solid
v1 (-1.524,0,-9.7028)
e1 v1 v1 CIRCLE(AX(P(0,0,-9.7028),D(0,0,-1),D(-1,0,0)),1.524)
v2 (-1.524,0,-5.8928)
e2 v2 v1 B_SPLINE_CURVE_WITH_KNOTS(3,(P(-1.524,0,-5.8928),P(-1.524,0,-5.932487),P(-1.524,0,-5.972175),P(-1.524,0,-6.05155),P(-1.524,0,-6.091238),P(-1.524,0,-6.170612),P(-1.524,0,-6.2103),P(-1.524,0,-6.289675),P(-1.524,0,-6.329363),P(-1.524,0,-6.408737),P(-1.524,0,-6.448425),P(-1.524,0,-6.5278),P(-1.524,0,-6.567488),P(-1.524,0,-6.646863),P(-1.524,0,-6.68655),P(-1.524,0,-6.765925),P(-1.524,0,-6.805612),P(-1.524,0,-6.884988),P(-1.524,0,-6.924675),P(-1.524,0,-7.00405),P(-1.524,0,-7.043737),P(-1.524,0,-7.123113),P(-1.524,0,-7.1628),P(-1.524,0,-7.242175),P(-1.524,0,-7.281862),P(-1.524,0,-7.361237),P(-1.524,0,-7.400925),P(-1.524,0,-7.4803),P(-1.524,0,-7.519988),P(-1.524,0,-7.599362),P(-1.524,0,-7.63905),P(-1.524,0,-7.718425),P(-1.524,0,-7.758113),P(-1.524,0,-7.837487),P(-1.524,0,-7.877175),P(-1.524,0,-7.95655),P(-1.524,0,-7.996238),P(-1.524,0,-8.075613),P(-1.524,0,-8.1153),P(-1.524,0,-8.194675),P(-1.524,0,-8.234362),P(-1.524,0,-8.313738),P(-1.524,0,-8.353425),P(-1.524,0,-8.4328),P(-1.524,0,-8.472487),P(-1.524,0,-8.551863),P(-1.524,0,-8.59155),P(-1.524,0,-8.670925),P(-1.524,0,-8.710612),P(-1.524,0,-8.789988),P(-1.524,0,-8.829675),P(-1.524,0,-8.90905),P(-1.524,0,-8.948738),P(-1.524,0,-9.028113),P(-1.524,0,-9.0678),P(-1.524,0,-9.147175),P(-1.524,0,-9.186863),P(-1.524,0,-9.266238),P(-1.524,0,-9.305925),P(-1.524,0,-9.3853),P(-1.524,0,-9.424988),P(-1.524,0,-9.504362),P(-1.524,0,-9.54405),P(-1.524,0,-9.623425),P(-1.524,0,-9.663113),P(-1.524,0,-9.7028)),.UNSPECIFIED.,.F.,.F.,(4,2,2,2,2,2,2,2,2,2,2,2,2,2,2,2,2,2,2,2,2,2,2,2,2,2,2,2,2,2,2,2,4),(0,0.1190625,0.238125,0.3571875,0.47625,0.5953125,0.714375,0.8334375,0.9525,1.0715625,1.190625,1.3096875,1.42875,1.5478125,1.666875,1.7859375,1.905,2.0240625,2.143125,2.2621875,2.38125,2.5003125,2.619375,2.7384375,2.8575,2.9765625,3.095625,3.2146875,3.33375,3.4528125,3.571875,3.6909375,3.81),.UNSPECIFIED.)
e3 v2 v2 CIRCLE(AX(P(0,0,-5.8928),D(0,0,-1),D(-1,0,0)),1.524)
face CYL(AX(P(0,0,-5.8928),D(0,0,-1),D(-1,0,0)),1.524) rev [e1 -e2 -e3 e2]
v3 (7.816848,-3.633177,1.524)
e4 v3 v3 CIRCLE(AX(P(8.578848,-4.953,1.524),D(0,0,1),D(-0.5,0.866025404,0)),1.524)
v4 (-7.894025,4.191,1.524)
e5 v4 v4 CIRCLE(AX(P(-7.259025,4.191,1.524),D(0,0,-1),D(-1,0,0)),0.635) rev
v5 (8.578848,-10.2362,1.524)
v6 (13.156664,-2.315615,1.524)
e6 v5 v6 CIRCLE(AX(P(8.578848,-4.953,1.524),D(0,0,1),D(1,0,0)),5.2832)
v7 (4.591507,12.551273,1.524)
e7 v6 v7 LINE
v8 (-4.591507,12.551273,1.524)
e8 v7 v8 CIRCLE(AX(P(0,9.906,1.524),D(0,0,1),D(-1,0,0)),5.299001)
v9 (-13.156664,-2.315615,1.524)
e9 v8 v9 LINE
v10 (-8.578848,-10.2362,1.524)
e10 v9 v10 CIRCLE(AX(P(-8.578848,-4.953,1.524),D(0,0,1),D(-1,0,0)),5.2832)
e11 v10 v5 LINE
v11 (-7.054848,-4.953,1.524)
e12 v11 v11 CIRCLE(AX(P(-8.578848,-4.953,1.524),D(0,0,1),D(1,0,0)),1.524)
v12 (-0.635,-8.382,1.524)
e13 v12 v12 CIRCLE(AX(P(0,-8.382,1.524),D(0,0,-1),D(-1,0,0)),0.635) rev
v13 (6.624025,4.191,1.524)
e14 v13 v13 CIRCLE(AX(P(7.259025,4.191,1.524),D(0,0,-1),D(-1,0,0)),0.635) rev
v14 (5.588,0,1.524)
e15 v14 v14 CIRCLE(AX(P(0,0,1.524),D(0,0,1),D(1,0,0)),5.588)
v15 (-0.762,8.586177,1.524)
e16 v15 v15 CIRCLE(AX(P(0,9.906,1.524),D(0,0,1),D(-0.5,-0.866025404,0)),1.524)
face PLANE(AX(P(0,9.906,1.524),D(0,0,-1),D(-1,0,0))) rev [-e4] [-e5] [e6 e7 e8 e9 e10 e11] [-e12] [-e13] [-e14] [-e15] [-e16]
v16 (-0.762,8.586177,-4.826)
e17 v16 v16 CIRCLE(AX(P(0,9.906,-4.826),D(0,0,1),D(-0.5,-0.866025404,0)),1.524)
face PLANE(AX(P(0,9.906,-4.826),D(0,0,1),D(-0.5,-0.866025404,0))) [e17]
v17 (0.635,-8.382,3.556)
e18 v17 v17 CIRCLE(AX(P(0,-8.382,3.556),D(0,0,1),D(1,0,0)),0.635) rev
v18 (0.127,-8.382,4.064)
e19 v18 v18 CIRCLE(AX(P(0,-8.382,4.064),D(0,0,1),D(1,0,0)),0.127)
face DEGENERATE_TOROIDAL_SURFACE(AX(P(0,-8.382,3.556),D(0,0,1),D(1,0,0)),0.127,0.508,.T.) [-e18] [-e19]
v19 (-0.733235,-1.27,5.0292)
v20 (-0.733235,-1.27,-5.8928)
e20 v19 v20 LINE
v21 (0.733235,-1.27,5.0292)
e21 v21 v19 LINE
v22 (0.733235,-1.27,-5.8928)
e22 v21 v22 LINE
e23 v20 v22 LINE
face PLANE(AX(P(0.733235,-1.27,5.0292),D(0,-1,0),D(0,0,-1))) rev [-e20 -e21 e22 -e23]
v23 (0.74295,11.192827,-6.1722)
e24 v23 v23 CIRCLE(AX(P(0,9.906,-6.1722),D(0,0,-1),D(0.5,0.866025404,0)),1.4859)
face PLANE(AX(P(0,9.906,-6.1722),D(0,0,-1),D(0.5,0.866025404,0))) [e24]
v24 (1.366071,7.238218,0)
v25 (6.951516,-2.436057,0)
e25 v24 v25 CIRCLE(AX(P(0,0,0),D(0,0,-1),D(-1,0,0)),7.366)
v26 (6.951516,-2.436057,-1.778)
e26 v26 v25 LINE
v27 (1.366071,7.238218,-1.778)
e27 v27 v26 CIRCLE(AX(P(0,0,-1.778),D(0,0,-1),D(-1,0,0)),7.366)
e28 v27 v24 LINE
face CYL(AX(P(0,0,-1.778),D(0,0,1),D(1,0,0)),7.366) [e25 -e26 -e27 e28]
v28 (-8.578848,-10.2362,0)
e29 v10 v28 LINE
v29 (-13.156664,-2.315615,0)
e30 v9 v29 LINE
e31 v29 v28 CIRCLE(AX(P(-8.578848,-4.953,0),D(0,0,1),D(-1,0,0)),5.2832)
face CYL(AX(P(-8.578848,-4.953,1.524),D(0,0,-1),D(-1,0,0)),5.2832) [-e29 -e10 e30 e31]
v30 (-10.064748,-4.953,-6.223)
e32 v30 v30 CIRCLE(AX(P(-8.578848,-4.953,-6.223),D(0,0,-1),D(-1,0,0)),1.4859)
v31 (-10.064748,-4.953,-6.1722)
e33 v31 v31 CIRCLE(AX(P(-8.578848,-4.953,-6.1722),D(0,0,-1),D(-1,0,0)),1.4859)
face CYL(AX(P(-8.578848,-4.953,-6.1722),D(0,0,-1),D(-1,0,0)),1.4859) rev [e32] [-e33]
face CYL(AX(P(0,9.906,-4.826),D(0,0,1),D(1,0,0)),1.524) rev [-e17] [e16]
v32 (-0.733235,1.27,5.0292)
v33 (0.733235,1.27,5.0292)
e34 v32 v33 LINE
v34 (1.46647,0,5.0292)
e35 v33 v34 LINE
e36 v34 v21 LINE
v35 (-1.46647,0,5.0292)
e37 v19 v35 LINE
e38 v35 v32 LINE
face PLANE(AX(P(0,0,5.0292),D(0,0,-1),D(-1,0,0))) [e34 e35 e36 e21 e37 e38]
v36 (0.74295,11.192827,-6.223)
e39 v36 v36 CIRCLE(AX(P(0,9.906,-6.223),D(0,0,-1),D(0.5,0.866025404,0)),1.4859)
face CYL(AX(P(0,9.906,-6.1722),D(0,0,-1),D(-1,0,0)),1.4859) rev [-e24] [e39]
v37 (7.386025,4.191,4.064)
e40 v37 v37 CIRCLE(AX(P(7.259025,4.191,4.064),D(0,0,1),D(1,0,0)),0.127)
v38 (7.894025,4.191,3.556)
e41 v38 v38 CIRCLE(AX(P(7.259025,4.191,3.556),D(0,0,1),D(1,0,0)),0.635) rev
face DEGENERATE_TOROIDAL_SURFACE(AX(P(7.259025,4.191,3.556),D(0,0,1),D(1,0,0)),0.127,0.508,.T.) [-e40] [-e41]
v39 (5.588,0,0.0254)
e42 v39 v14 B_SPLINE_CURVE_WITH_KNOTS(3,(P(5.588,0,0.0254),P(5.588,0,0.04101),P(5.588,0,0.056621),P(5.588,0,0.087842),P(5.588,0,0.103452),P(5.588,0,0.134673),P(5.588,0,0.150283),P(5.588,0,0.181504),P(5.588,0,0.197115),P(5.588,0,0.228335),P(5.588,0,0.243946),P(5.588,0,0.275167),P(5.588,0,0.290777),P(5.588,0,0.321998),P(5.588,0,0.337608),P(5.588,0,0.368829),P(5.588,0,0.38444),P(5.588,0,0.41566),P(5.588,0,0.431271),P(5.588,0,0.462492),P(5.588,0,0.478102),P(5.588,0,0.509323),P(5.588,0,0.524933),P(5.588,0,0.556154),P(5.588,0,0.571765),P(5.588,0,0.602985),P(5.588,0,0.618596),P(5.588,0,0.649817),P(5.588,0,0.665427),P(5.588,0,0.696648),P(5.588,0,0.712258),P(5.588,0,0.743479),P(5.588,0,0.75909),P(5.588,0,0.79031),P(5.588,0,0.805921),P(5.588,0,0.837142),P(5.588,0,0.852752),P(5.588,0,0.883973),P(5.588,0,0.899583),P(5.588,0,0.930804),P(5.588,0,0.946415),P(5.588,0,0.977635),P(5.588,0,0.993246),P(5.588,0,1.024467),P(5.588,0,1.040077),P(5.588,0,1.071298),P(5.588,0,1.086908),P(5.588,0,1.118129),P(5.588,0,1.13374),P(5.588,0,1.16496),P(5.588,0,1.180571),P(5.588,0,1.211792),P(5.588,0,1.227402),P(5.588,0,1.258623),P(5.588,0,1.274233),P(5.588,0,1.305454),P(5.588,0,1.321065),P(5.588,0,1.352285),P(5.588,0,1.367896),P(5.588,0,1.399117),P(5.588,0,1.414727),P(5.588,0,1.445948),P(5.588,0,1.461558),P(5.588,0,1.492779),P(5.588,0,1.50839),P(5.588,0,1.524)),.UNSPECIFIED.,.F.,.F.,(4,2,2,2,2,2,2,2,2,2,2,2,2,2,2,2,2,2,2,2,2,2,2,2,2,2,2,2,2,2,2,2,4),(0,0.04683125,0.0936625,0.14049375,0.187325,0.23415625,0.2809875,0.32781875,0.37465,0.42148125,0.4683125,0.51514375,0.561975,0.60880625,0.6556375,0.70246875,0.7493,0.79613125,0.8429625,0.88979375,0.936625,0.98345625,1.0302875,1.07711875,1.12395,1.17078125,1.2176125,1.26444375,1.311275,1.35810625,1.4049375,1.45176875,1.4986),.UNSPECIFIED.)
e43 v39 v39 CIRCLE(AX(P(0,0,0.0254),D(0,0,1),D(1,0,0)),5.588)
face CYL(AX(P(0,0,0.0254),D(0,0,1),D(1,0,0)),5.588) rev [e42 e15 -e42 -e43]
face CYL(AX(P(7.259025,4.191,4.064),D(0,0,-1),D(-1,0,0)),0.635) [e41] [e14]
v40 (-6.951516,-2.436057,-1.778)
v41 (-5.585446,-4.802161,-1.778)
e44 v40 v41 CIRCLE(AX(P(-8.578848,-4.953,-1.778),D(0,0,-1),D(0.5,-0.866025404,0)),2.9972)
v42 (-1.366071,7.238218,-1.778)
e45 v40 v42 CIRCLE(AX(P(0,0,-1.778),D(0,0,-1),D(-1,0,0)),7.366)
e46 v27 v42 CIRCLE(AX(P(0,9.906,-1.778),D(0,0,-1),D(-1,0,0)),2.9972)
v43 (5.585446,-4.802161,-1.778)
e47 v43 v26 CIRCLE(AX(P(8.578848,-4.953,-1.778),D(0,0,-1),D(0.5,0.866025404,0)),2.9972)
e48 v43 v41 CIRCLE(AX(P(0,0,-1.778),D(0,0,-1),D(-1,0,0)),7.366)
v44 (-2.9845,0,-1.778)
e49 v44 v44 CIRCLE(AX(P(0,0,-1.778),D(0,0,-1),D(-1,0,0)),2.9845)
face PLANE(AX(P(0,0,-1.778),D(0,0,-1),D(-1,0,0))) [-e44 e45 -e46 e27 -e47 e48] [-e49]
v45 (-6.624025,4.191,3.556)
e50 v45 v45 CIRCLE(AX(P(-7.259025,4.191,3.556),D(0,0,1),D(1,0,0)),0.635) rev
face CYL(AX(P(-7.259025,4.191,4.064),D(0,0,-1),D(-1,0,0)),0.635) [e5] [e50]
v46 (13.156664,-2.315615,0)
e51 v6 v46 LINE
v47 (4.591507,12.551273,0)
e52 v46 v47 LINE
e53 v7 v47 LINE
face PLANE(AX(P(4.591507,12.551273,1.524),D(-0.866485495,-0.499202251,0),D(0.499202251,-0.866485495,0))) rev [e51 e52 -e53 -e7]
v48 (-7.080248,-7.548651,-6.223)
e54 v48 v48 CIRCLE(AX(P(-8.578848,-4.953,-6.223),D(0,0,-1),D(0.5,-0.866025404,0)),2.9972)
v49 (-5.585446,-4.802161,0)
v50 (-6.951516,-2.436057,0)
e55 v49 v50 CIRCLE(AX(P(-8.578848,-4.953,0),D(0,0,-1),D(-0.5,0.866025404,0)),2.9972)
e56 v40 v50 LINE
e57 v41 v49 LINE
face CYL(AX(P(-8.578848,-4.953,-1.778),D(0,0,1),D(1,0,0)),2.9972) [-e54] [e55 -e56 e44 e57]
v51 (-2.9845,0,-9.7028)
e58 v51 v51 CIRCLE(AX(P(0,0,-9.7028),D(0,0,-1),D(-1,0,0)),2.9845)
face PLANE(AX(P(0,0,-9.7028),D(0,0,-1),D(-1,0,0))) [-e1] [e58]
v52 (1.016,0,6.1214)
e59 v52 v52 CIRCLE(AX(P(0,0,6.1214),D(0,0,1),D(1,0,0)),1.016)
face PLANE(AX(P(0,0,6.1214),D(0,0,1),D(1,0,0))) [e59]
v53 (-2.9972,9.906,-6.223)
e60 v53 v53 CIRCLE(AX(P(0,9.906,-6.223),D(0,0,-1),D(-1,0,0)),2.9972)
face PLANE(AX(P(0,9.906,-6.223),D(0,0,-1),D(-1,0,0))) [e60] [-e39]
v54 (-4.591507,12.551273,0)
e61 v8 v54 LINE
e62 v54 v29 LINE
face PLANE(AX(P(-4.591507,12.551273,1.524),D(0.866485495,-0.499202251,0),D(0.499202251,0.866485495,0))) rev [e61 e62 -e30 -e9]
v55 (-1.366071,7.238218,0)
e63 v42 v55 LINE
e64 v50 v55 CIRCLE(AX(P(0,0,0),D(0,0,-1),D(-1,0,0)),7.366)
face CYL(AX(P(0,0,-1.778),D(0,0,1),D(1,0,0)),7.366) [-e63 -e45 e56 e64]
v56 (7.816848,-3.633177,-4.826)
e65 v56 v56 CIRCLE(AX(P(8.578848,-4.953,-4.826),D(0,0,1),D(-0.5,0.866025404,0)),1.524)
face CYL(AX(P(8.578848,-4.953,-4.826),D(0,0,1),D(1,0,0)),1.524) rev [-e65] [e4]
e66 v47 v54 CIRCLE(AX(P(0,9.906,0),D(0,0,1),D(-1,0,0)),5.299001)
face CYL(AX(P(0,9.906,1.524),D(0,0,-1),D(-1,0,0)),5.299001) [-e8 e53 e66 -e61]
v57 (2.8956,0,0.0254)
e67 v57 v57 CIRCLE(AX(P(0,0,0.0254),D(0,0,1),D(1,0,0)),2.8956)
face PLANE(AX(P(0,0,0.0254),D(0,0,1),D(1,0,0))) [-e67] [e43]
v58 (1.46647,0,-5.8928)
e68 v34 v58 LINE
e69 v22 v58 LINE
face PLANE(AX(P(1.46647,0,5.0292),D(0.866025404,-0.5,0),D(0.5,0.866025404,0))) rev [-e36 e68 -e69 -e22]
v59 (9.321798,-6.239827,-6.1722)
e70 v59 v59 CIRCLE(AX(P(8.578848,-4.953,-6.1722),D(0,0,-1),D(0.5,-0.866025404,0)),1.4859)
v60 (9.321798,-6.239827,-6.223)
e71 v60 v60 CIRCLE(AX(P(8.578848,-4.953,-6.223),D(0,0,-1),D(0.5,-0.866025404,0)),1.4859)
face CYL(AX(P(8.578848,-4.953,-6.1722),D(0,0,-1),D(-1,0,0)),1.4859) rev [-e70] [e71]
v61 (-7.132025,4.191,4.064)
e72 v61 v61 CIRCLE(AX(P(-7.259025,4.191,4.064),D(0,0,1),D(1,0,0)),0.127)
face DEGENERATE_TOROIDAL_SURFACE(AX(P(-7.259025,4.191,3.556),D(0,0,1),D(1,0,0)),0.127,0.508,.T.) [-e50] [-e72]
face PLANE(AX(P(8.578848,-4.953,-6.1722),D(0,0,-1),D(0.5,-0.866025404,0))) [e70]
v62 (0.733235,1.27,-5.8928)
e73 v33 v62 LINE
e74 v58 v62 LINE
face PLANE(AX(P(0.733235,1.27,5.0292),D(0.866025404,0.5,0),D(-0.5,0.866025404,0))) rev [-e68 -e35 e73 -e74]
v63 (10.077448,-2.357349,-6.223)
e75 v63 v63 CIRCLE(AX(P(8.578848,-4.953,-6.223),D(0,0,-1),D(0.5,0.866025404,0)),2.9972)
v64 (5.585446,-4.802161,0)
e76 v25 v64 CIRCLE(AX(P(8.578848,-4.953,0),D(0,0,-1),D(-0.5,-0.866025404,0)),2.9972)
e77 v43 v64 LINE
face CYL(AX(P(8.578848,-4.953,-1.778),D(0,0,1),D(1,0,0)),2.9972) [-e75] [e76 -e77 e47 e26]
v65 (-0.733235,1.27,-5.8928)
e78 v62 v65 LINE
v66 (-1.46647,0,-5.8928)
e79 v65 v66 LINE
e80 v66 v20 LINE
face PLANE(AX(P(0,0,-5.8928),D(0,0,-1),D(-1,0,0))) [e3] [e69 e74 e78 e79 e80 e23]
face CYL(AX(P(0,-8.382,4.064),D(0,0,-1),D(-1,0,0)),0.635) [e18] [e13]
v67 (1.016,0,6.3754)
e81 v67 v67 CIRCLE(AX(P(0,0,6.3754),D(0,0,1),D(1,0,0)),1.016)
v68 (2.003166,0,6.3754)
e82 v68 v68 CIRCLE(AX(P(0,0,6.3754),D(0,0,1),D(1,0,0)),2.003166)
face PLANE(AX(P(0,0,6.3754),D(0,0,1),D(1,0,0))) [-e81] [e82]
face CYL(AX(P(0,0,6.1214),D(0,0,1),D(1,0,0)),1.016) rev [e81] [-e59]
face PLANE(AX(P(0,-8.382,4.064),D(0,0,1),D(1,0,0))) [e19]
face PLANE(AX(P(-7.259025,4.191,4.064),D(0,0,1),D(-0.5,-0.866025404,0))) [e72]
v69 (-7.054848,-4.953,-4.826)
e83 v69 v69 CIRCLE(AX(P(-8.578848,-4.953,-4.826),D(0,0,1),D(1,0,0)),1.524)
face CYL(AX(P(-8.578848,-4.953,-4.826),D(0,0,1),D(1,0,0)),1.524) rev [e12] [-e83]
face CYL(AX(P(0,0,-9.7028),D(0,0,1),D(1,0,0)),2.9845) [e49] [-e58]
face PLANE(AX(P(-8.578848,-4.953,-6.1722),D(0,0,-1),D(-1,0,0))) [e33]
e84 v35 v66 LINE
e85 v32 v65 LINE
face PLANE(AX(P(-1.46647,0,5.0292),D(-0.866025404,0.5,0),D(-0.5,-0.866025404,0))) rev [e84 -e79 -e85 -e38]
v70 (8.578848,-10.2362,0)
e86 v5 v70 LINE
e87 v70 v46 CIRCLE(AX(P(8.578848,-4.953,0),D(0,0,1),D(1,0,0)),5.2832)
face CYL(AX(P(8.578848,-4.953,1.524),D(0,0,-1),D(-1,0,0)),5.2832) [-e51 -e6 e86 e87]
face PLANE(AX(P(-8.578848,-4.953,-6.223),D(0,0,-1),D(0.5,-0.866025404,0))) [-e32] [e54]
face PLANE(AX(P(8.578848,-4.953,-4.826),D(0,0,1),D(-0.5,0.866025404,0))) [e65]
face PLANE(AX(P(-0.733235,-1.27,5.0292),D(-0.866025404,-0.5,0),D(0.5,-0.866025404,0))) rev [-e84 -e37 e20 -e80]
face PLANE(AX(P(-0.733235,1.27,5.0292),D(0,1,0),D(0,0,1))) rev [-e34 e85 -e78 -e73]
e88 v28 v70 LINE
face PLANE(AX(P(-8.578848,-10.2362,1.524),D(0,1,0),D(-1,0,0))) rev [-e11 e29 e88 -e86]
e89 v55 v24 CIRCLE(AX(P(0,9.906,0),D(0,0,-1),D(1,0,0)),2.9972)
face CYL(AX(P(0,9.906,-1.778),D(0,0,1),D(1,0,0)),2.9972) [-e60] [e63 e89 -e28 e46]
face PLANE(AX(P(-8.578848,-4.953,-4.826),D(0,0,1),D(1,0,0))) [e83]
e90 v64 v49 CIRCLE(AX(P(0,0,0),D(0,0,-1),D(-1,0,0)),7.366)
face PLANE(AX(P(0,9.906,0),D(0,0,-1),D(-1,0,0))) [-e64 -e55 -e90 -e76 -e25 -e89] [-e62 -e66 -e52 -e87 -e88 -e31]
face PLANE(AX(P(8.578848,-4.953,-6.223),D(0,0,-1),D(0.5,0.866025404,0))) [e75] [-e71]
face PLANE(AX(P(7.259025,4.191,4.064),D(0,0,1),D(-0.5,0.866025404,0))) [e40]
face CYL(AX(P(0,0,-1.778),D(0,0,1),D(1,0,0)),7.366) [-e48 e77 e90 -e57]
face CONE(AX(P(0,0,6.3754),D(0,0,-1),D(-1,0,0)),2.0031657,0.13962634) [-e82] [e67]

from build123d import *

# Parameters (mm, degrees)
BOSS_EXTRUDE1_DEPTH      = 1.524
SKETCH2_R                = 5.588
CUT_EXTRUDE1_DEPTH       = 1.4986
SKETCH3_R                = 2.8956
BOSS_EXTRUDE2_DEPTH      = 6.35
CHAMFER1_SIZE            = 6.35
CHAMFER1_SIZE_2          = 0.8924343
SKETCH4_R                = 1.016
CUT_EXTRUDE2_DEPTH       = 0.254
SKETCH5_R                = 7.366
BOSS_EXTRUDE3_DEPTH      = 1.778
BOSS_EXTRUDE4_DEPTH      = 1.778
CIRPATTERN1_COUNT        = 3
SKETCH7_R                = 2.9972
BOSS_EXTRUDE5_DEPTH      = 4.445
CIRPATTERN2_COUNT        = 3
SKETCH8_R                = 1.4859
CUT_EXTRUDE3_DEPTH       = 0.0508
CIRPATTERN3_COUNT        = 3
SKETCH9_R                = 2.9845
BOSS_EXTRUDE6_DEPTH      = 7.9248
CUT_EXTRUDE4_DEPTH       = 14.732
SKETCH11_R               = 1.524
CUT_EXTRUDE5_DEPTH       = 3.81
SKETCH16_R               = 1.524
CUT_EXTRUDE6_DEPTH       = 6.35
CIRPATTERN4_COUNT        = 3
SKETCH17_R               = 0.635
BOSS_EXTRUDE7_DEPTH      = 2.54
FILLET1_R                = 0.508
CIRPATTERN6_COUNT        = 3
FILLET1_OF_CIRPATTERN6_R = 0.508


with BuildPart() as part:
    # Sketch1 → Boss-Extrude1 (new body)
    with BuildSketch(Plane.XY):
        with BuildLine():
            Line((-4.591507335, 12.551273129), (-13.156663816, -2.315614668))
            ThreePointArc((-13.156663816, -2.315614668), (-13.153016231, -7.596706494), (-8.57884765, -10.2362))
            Line((-8.57884765, -10.2362), (8.57884765, -10.2362))
            ThreePointArc((8.57884765, -10.2362), (13.153016231, -7.596706494), (13.156663816, -2.315614668))
            Line((13.156663816, -2.315614668), (4.591507335, 12.551273129))
            ThreePointArc((4.591507335, 12.551273129), (0, 15.205000805), (-4.591507335, 12.551273129))
        make_face()
    extrude(amount=BOSS_EXTRUDE1_DEPTH)

    # Sketch2 → Cut-Extrude1 (cut)
    with BuildSketch(Plane.XY.offset(1.524)):
        Circle(SKETCH2_R)
    extrude(amount=-CUT_EXTRUDE1_DEPTH, mode=Mode.SUBTRACT)

    # Sketch3 → Boss-Extrude2 (add)
    with BuildSketch(Plane.XY.offset(0.0254)):
        Circle(SKETCH3_R)
    extrude(amount=BOSS_EXTRUDE2_DEPTH)

    # Chamfer1
    # the kernel refuses this chamfer: 6.35, 0.8924343 mm, written as the material it takes off along each edge
    with BuildSketch(Plane(origin=(0, 0, 6.3754), x_dir=(1, 0, 0), z_dir=(0, -1, 0))) as chamfer1_piece_1:
        Polygon((2.8956, -CHAMFER1_SIZE), (2.8956 - CHAMFER1_SIZE_2, 0), (2.8956, 0), align=None)
    revolve(axis=Axis((0, 0, 6.3754), (0, 0, 1)), mode=Mode.SUBTRACT)

    # Sketch4 → Cut-Extrude2 (cut)
    with BuildSketch(Plane.XY.offset(6.3754)):
        Circle(SKETCH4_R)
    extrude(amount=-CUT_EXTRUDE2_DEPTH, mode=Mode.SUBTRACT)

    # Sketch5 → Boss-Extrude3 (add)
    with BuildSketch(Plane(origin=(0, 0, 0), x_dir=(-1, 0, 0), z_dir=(0, 0, -1))):
        Circle(SKETCH5_R)
    extrude(amount=BOSS_EXTRUDE3_DEPTH)

    # Sketch6 → Boss-Extrude4 (add)
    with BuildSketch(Plane(origin=(0, 0, 0), x_dir=(-1, 0, 0), z_dir=(0, 0, -1))):
        with BuildLine():
            ThreePointArc((-1.366070827, 7.238218462), (0, 12.9032), (1.366070827, 7.238218462))
            ThreePointArc((1.366070827, 7.238218462), (0, 7.366), (-1.366070827, 7.238218462))
        make_face()
    boss_extrude4 = extrude(amount=BOSS_EXTRUDE4_DEPTH)

    # CirPattern1: Boss-Extrude4 ×3 about axis
    cirpattern1_axis = Axis((0, 0, 0), (0, 0, 1))
    for i in range(1, CIRPATTERN1_COUNT):
        add(boss_extrude4.rotate(cirpattern1_axis, i * 360 / CIRPATTERN1_COUNT))

    # Sketch7 → Boss-Extrude5 (add)
    with BuildSketch(Plane(origin=(0, 0, -1.778), x_dir=(-1, 0, 0), z_dir=(0, 0, -1))):
        with Locations(Location((0, 9.906, 0), (0, 0, 242.884717398))):
            Circle(SKETCH7_R)
    boss_extrude5 = extrude(amount=BOSS_EXTRUDE5_DEPTH)

    # CirPattern2: Boss-Extrude5 ×3 about axis
    cirpattern2_axis = Axis((0, 0, 0), (0, 0, 1))
    for i in range(1, CIRPATTERN2_COUNT):
        add(boss_extrude5.rotate(cirpattern2_axis, i * 360 / CIRPATTERN2_COUNT))

    # Sketch8 → Cut-Extrude3 (cut)
    with BuildSketch(Plane(origin=(0, 0, -6.223), x_dir=(-1, 0, 0), z_dir=(0, 0, -1))):
        with Locations((8.57884765, -4.953)):
            Circle(SKETCH8_R)
    cut_extrude3 = extrude(amount=-CUT_EXTRUDE3_DEPTH, mode=Mode.SUBTRACT)

    # CirPattern3: Cut-Extrude3 ×3 about axis
    cirpattern3_axis = Axis((0, 0, 0), (0, 0, 1))
    for i in range(1, CIRPATTERN3_COUNT):
        add(cut_extrude3.rotate(cirpattern3_axis, i * 360 / CIRPATTERN3_COUNT), mode=Mode.SUBTRACT)

    # Sketch9 → Boss-Extrude6 (add)
    with BuildSketch(Plane(origin=(0, 0, -1.778), x_dir=(-1, 0, 0), z_dir=(0, 0, -1))):
        Circle(SKETCH9_R)
    extrude(amount=BOSS_EXTRUDE6_DEPTH)

    # Sketch10 → Cut-Extrude4 (cut)
    with BuildSketch(Plane(origin=(0, 0, -9.7028), x_dir=(-1, 0, 0), z_dir=(0, 0, -1))):
        Polygon((-1.466469684, 0), (-0.733234842, -1.27), (0.733234842, -1.27), (1.466469684, 0), (0.733234842, 1.27), (-0.733234842, 1.27), align=None)
    extrude(amount=-CUT_EXTRUDE4_DEPTH, mode=Mode.SUBTRACT)

    # Sketch11 → Cut-Extrude5 (cut)
    with BuildSketch(Plane(origin=(0, 0, -9.7028), x_dir=(-1, 0, 0), z_dir=(0, 0, -1))):
        Circle(SKETCH11_R)
    extrude(amount=-CUT_EXTRUDE5_DEPTH, mode=Mode.SUBTRACT)

    # Sketch16 → Cut-Extrude6 (cut)
    with BuildSketch(Plane.XY.offset(1.524)):
        with Locations((-8.57884765, -4.953)):
            Circle(SKETCH16_R)
    cut_extrude6 = extrude(amount=-CUT_EXTRUDE6_DEPTH, mode=Mode.SUBTRACT)

    # CirPattern4: Cut-Extrude6 ×3 about axis
    cirpattern4_axis = Axis((0, 0, 0), (0, 0, 1))
    for i in range(1, CIRPATTERN4_COUNT):
        add(cut_extrude6.rotate(cirpattern4_axis, i * 360 / CIRPATTERN4_COUNT), mode=Mode.SUBTRACT)

    # Sketch17 → Boss-Extrude7 (add)
    with BuildSketch(Plane.XY.offset(1.524)):
        with Locations(Location((0, -8.382, 0), (0, 0, 180))):
            Circle(SKETCH17_R)
    boss_extrude7 = extrude(amount=BOSS_EXTRUDE7_DEPTH)

    # Fillet1
    fillet1_edges = [part.edges().sort_by_distance(p)[0] for p in [
        (0.635, -8.382, 4.064),
    ]]
    fillet(fillet1_edges, radius=FILLET1_R)

    # CirPattern6: Boss-Extrude7 ×3 about axis
    cirpattern6_axis = Axis((0, 0, 0), (0, 0, 1))
    for i in range(1, CIRPATTERN6_COUNT):
        add(boss_extrude7.rotate(cirpattern6_axis, i * 360 / CIRPATTERN6_COUNT))

    # Fillet1 of CirPattern6
    fillet1_of_cirpattern6_edges = [part.edges().sort_by_distance(p)[0] for p in [
        (6.941524935, 4.740926131, 4.064),
        (-7.576524935, 3.641073869, 4.064),
    ]]
    fillet(fillet1_of_cirpattern6_edges, radius=FILLET1_OF_CIRPATTERN6_R)


solid = part.part
